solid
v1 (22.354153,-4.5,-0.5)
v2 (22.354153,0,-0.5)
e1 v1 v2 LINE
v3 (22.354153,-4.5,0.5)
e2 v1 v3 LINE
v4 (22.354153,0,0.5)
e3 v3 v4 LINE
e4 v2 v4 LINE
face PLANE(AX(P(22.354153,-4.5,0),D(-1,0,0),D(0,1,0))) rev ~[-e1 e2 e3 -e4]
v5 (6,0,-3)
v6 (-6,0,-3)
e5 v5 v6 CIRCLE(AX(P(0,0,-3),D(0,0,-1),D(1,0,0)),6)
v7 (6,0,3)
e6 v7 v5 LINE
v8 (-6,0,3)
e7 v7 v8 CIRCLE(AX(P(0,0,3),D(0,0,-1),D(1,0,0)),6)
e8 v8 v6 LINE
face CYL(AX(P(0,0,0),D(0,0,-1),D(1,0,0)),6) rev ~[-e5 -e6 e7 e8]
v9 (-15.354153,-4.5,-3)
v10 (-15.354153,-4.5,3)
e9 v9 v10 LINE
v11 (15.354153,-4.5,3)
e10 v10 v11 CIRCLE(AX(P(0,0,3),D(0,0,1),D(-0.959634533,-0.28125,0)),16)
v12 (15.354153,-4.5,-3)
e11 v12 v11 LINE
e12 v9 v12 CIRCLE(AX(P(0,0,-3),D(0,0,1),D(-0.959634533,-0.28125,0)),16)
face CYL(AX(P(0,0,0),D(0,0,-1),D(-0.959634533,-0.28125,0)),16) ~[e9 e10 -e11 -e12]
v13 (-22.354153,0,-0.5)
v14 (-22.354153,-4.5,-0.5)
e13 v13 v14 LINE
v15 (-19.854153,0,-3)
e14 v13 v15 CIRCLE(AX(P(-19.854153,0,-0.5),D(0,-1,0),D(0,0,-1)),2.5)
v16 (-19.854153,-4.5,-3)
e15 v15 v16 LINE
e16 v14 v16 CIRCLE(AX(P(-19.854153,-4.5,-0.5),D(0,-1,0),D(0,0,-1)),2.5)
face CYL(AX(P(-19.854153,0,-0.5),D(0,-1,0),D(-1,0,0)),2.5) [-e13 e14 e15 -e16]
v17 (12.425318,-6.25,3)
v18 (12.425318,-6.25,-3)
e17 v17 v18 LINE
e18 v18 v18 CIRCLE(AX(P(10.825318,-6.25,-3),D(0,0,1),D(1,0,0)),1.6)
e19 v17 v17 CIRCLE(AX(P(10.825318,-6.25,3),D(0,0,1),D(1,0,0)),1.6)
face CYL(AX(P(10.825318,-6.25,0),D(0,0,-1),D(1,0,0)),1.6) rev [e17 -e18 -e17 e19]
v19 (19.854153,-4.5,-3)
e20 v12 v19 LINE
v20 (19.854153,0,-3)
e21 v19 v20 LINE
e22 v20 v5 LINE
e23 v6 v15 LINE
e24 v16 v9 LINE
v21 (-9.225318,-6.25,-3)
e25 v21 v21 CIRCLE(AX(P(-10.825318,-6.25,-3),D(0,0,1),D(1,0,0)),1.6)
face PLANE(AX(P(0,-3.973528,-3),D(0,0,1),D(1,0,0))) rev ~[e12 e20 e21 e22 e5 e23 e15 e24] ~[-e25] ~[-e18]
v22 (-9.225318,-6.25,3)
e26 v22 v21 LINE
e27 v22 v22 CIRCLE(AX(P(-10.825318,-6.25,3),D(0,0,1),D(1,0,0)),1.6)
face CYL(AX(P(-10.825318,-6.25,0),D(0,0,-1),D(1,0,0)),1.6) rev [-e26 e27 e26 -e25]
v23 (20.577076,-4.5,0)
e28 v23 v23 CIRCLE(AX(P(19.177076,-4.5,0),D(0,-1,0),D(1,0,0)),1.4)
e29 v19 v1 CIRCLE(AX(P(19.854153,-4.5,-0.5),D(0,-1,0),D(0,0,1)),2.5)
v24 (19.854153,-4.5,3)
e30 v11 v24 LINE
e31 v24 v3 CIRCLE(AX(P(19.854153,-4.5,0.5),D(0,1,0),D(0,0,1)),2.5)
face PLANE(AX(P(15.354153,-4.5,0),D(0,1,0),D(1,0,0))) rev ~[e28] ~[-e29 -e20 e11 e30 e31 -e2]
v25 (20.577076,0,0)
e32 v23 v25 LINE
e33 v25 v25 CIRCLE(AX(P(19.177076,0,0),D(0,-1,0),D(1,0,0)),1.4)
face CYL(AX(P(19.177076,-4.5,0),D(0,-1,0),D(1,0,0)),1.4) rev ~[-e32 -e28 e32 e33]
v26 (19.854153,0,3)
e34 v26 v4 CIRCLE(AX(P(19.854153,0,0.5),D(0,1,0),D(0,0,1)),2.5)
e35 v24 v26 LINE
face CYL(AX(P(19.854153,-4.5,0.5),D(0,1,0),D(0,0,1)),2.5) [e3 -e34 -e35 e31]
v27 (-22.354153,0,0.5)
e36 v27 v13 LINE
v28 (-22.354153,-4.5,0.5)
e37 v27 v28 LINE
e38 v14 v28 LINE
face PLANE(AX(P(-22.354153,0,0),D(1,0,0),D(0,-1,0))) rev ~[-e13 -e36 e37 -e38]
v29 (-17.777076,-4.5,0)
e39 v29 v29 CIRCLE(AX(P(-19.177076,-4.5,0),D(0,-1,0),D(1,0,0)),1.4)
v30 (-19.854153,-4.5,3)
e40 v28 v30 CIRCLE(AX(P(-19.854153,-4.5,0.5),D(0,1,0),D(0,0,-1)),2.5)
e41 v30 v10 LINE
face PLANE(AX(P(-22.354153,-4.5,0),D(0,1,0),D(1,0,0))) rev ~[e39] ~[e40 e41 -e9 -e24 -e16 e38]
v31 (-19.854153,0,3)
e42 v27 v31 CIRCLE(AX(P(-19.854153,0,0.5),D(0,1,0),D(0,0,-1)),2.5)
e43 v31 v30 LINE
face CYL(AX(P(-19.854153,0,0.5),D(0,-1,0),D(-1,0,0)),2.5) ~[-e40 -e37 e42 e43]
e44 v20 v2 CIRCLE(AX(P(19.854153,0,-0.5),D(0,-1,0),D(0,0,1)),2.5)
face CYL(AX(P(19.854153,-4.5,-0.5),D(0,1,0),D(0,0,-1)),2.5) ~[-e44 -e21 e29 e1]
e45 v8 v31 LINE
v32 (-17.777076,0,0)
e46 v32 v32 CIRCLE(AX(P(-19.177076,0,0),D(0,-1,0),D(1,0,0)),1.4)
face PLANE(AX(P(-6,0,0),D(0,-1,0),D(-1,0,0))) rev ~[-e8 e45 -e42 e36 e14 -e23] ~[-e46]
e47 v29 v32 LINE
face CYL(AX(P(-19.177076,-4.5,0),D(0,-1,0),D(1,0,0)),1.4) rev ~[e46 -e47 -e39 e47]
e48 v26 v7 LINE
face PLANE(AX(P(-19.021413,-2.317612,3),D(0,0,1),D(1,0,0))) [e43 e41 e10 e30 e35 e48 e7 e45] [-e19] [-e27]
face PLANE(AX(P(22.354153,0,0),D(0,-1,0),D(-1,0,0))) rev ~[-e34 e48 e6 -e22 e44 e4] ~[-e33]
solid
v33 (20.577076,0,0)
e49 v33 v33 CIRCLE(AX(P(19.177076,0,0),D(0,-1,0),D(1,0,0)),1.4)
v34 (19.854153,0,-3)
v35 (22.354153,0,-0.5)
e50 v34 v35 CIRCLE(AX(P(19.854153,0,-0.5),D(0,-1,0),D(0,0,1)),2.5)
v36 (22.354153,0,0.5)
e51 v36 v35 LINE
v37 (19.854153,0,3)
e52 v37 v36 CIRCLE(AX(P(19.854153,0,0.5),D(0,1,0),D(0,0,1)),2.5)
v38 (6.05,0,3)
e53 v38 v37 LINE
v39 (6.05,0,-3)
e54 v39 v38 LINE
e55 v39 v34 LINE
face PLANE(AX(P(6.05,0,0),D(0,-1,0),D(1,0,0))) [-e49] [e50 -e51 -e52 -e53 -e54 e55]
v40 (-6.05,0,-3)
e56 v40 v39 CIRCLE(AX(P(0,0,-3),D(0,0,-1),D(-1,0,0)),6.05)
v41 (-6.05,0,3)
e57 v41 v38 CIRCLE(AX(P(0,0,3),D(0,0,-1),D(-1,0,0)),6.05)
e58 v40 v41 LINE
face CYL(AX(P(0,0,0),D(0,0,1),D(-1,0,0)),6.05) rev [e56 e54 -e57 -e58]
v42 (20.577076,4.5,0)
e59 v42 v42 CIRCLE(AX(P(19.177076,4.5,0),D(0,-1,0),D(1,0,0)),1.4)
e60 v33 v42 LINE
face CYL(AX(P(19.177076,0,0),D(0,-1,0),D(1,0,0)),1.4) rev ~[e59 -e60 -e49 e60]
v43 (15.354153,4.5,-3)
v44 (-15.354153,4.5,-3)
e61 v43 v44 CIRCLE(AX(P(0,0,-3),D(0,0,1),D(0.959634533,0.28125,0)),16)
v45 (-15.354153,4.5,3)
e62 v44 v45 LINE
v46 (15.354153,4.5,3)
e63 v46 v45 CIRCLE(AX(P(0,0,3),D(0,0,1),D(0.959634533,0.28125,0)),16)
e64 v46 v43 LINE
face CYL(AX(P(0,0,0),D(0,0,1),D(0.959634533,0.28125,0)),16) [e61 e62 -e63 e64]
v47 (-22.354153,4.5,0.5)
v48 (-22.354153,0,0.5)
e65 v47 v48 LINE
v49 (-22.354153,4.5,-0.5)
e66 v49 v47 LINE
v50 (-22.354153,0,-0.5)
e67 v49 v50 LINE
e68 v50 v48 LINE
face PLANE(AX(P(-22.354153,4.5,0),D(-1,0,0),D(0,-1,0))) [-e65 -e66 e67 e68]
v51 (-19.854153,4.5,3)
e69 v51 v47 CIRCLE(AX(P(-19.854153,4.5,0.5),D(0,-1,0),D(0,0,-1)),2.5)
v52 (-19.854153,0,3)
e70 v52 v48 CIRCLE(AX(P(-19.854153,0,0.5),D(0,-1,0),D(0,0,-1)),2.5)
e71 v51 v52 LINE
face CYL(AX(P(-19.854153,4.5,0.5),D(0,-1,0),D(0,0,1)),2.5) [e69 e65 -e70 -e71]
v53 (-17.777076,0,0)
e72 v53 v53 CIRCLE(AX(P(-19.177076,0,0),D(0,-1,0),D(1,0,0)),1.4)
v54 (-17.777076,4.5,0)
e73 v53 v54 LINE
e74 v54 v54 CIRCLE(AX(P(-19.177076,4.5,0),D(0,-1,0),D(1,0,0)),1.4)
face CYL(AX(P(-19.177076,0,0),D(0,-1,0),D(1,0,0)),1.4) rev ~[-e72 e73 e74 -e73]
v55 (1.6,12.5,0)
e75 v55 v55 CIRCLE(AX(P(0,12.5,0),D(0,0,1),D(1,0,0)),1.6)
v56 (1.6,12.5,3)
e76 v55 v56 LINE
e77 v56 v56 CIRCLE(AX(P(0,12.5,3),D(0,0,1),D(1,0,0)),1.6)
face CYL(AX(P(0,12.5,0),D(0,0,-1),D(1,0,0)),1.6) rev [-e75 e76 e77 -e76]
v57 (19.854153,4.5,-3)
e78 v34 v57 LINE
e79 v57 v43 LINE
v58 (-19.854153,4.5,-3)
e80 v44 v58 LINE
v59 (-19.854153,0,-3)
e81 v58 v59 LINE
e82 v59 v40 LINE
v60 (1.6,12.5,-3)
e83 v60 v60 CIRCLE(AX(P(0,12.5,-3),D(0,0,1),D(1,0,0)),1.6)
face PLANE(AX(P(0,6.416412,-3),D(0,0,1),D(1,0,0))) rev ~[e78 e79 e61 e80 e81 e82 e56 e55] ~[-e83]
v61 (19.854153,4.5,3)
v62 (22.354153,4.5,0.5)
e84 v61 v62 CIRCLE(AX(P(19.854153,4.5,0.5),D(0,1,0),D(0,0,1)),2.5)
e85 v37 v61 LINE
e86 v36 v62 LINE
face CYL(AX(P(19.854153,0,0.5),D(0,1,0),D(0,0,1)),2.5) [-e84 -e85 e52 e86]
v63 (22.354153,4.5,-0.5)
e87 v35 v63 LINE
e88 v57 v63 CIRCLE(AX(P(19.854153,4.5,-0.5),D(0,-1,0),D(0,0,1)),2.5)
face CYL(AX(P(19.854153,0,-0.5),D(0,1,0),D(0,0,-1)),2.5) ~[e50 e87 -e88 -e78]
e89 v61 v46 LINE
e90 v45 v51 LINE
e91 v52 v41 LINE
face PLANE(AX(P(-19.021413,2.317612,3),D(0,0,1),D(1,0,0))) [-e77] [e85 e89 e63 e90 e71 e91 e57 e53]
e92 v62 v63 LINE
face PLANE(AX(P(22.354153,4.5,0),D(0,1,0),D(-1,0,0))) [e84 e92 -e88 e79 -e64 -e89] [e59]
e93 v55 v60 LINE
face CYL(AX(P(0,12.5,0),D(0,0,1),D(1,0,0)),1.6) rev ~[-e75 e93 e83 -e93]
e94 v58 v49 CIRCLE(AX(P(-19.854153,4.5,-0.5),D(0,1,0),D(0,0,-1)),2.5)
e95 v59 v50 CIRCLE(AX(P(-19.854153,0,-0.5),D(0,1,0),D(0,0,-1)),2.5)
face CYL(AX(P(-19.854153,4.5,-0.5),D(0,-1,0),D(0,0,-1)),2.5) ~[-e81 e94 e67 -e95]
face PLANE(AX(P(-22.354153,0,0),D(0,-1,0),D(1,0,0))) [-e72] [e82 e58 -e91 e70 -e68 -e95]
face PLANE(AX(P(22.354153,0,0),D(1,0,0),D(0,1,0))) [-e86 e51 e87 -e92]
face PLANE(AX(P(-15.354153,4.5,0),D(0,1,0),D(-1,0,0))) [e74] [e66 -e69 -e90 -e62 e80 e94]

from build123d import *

# Parameters (mm, degrees)
F0_R      = 1.6
F1_DEPTH  = 3
F2_DEPTH  = 3
F3_R      = 1.4
F4_DEPTH  = 16.001
F5_R      = 2.5
F6_R      = 1.6
F7_DEPTH  = 3
F8_DEPTH  = 3
F9_R      = 1.4
F10_DEPTH = 25
F11_R     = 2.5


# Not quite as in the source:
# - a feature names something its author has since deleted; it is built from what else it names


with BuildPart() as f1:
    # F0 (on Top) → F1 (new body)
    with BuildSketch(Plane.XY):
        with BuildLine():
            ThreePointArc((-16, 0), (-15.8377151213, 2.273055155), (-15.3541525328, 4.5))
            Line((-15.3541525328, 4.5), (-22.3541525328, 4.5))
            Line((-22.3541525328, 4.5), (-22.3541525328, 0))
            Line((-22.3541525328, 0), (-16, 0))
        make_face()
        with BuildLine():
            Line((7.65, 0), (16, 0))
            ThreePointArc((16, 0), (15.8377151213, 2.273055155), (15.3541525328, 4.5))
            ThreePointArc((15.3541525328, 4.5), (0, 16), (-15.3541525328, 4.5))
            ThreePointArc((-15.3541525328, 4.5), (-15.8377151213, 2.273055155), (-16, 0))
            Line((-16, 0), (-7.65, 0))
            ThreePointArc((-7.65, 0), (0, 7.65), (7.65, 0))
        make_face()
        with Locations((0, 12.5)):
            Circle(F0_R, mode=Mode.SUBTRACT)
        with BuildLine():
            ThreePointArc((-6.05, 0), (0, 6.05), (6.05, 0))
            Line((6.05, 0), (7.65, 0))
            ThreePointArc((7.65, 0), (0, 7.65), (-7.65, 0))
            Line((-7.65, 0), (-6.05, 0))
        make_face()
        with BuildLine():
            ThreePointArc((15.3541525328, 4.5), (15.8377151213, 2.273055155), (16, 0))
            Line((16, 0), (22.3541525328, 0))
            Line((22.3541525328, 0), (22.3541525328, 4.5))
            Line((22.3541525328, 4.5), (15.3541525328, 4.5))
        make_face()
    extrude(amount=F1_DEPTH)

    # F0 (on Top) → F2 (join)
    with BuildSketch(Plane.XY):
        with BuildLine():
            Line((7.65, 0), (16, 0))
            ThreePointArc((16, 0), (15.8377151213, 2.273055155), (15.3541525328, 4.5))
            ThreePointArc((15.3541525328, 4.5), (0, 16), (-15.3541525328, 4.5))
            ThreePointArc((-15.3541525328, 4.5), (-15.8377151213, 2.273055155), (-16, 0))
            Line((-16, 0), (-7.65, 0))
            ThreePointArc((-7.65, 0), (0, 7.65), (7.65, 0))
        make_face()
        with Locations((0, 12.5)):
            Circle(F0_R, mode=Mode.SUBTRACT)
        with BuildLine():
            ThreePointArc((-6.05, 0), (0, 6.05), (6.05, 0))
            Line((6.05, 0), (7.65, 0))
            ThreePointArc((7.65, 0), (0, 7.65), (-7.65, 0))
            Line((-7.65, 0), (-6.05, 0))
        make_face()
        with BuildLine():
            ThreePointArc((15.3541525328, 4.5), (15.8377151213, 2.273055155), (16, 0))
            Line((16, 0), (22.3541525328, 0))
            Line((22.3541525328, 0), (22.3541525328, 4.5))
            Line((22.3541525328, 4.5), (15.3541525328, 4.5))
        make_face()
        with BuildLine():
            ThreePointArc((-16, 0), (-15.8377151213, 2.273055155), (-15.3541525328, 4.5))
            Line((-15.3541525328, 4.5), (-22.3541525328, 4.5))
            Line((-22.3541525328, 4.5), (-22.3541525328, 0))
            Line((-22.3541525328, 0), (-16, 0))
        make_face()
    extrude(amount=-F2_DEPTH)

    # F3 (on face) → F4 (cut, through all)
    with BuildSketch(Plane.XZ):
        with Locations((19.1770762664, 0)):
            Circle(F3_R)
        with Locations((-19.1770762664, 0)):
            Circle(F3_R)
    extrude(amount=-F4_DEPTH, mode=Mode.SUBTRACT)

    # F5
    f5_edges = [f1.edges().sort_by_distance(p)[0] for p in [
        (-22.354153, 2.25, 3),
        (22.354153, 2.25, 3),
        (-22.354153, 2.25, -3),
        (22.354153, 2.25, -3),
    ]]
    fillet(f5_edges, radius=F5_R)


with BuildPart() as f7:
    # F6 (on Top) → F7 (new body)
    with BuildSketch(Plane.XY):
        with BuildLine():
            ThreePointArc((6, 0), (0, -6), (-6, 0))
            Line((-6, 0), (-9, 0))
            ThreePointArc((-9, 0), (0, -9), (9, 0))
            Line((9, 0), (6, 0))
        make_face()
        with BuildLine():
            ThreePointArc((9, 0), (0, -9), (-9, 0))
            Line((-9, 0), (-16, 0))
            ThreePointArc((-16, 0), (-15.8377151213, -2.273055155), (-15.3541525328, -4.5))
            ThreePointArc((-15.3541525328, -4.5), (0, -16), (15.3541525328, -4.5))
            ThreePointArc((15.3541525328, -4.5), (15.8377151213, -2.273055155), (16, 0))
            Line((16, 0), (9, 0))
        make_face()
        with Locations((-10.8253175473, -6.25)):
            Circle(F6_R, mode=Mode.SUBTRACT)
        with Locations((10.8253175473, -6.25)):
            Circle(F6_R, mode=Mode.SUBTRACT)
        with BuildLine():
            ThreePointArc((-15.3541525328, -4.5), (-15.8377151213, -2.273055155), (-16, 0))
            Line((-16, 0), (-22.3541525328, 0))
            Line((-22.3541525328, 0), (-22.3541525328, -4.5))
            Line((-22.3541525328, -4.5), (-15.3541525328, -4.5))
        make_face()
        with BuildLine():
            Line((22.3541525328, 0), (16, 0))
            ThreePointArc((16, 0), (15.8377151213, -2.273055155), (15.3541525328, -4.5))
            Line((15.3541525328, -4.5), (22.3541525328, -4.5))
            Line((22.3541525328, -4.5), (22.3541525328, 0))
        make_face()
    extrude(amount=-F7_DEPTH)

    # F6 (on Top) → F8 (join)
    with BuildSketch(Plane.XY):
        with BuildLine():
            ThreePointArc((-15.3541525328, -4.5), (-15.8377151213, -2.273055155), (-16, 0))
            Line((-16, 0), (-22.3541525328, 0))
            Line((-22.3541525328, 0), (-22.3541525328, -4.5))
            Line((-22.3541525328, -4.5), (-15.3541525328, -4.5))
        make_face()
        with BuildLine():
            Line((22.3541525328, 0), (16, 0))
            ThreePointArc((16, 0), (15.8377151213, -2.273055155), (15.3541525328, -4.5))
            Line((15.3541525328, -4.5), (22.3541525328, -4.5))
            Line((22.3541525328, -4.5), (22.3541525328, 0))
        make_face()
        with BuildLine():
            ThreePointArc((9, 0), (0, -9), (-9, 0))
            Line((-9, 0), (-16, 0))
            ThreePointArc((-16, 0), (-15.8377151213, -2.273055155), (-15.3541525328, -4.5))
            ThreePointArc((-15.3541525328, -4.5), (0, -16), (15.3541525328, -4.5))
            ThreePointArc((15.3541525328, -4.5), (15.8377151213, -2.273055155), (16, 0))
            Line((16, 0), (9, 0))
        make_face()
        with Locations((-10.8253175473, -6.25)):
            Circle(F6_R, mode=Mode.SUBTRACT)
        with Locations((10.8253175473, -6.25)):
            Circle(F6_R, mode=Mode.SUBTRACT)
        with BuildLine():
            ThreePointArc((6, 0), (0, -6), (-6, 0))
            Line((-6, 0), (-9, 0))
            ThreePointArc((-9, 0), (0, -9), (9, 0))
            Line((9, 0), (6, 0))
        make_face()
    extrude(amount=F8_DEPTH)

    # F9 (on face) → F10 (cut)
    with BuildSketch(Plane.XZ.offset(4.5)):
        with Locations((-19.1770762664, 0)):
            Circle(F9_R)
        with Locations((19.1770762664, 0)):
            Circle(F9_R)
    extrude(amount=-F10_DEPTH, mode=Mode.SUBTRACT)

    # F11
    f11_edges = [f7.edges().sort_by_distance(p)[0] for p in [
        (22.354153, -2.25, -3),
        (22.354153, -2.25, 3),
        (-22.354153, -2.25, 3),
        (-22.354153, -2.25, -3),
    ]]
    fillet(f11_edges, radius=F11_R)


solid = Compound([f1.part, f7.part])
